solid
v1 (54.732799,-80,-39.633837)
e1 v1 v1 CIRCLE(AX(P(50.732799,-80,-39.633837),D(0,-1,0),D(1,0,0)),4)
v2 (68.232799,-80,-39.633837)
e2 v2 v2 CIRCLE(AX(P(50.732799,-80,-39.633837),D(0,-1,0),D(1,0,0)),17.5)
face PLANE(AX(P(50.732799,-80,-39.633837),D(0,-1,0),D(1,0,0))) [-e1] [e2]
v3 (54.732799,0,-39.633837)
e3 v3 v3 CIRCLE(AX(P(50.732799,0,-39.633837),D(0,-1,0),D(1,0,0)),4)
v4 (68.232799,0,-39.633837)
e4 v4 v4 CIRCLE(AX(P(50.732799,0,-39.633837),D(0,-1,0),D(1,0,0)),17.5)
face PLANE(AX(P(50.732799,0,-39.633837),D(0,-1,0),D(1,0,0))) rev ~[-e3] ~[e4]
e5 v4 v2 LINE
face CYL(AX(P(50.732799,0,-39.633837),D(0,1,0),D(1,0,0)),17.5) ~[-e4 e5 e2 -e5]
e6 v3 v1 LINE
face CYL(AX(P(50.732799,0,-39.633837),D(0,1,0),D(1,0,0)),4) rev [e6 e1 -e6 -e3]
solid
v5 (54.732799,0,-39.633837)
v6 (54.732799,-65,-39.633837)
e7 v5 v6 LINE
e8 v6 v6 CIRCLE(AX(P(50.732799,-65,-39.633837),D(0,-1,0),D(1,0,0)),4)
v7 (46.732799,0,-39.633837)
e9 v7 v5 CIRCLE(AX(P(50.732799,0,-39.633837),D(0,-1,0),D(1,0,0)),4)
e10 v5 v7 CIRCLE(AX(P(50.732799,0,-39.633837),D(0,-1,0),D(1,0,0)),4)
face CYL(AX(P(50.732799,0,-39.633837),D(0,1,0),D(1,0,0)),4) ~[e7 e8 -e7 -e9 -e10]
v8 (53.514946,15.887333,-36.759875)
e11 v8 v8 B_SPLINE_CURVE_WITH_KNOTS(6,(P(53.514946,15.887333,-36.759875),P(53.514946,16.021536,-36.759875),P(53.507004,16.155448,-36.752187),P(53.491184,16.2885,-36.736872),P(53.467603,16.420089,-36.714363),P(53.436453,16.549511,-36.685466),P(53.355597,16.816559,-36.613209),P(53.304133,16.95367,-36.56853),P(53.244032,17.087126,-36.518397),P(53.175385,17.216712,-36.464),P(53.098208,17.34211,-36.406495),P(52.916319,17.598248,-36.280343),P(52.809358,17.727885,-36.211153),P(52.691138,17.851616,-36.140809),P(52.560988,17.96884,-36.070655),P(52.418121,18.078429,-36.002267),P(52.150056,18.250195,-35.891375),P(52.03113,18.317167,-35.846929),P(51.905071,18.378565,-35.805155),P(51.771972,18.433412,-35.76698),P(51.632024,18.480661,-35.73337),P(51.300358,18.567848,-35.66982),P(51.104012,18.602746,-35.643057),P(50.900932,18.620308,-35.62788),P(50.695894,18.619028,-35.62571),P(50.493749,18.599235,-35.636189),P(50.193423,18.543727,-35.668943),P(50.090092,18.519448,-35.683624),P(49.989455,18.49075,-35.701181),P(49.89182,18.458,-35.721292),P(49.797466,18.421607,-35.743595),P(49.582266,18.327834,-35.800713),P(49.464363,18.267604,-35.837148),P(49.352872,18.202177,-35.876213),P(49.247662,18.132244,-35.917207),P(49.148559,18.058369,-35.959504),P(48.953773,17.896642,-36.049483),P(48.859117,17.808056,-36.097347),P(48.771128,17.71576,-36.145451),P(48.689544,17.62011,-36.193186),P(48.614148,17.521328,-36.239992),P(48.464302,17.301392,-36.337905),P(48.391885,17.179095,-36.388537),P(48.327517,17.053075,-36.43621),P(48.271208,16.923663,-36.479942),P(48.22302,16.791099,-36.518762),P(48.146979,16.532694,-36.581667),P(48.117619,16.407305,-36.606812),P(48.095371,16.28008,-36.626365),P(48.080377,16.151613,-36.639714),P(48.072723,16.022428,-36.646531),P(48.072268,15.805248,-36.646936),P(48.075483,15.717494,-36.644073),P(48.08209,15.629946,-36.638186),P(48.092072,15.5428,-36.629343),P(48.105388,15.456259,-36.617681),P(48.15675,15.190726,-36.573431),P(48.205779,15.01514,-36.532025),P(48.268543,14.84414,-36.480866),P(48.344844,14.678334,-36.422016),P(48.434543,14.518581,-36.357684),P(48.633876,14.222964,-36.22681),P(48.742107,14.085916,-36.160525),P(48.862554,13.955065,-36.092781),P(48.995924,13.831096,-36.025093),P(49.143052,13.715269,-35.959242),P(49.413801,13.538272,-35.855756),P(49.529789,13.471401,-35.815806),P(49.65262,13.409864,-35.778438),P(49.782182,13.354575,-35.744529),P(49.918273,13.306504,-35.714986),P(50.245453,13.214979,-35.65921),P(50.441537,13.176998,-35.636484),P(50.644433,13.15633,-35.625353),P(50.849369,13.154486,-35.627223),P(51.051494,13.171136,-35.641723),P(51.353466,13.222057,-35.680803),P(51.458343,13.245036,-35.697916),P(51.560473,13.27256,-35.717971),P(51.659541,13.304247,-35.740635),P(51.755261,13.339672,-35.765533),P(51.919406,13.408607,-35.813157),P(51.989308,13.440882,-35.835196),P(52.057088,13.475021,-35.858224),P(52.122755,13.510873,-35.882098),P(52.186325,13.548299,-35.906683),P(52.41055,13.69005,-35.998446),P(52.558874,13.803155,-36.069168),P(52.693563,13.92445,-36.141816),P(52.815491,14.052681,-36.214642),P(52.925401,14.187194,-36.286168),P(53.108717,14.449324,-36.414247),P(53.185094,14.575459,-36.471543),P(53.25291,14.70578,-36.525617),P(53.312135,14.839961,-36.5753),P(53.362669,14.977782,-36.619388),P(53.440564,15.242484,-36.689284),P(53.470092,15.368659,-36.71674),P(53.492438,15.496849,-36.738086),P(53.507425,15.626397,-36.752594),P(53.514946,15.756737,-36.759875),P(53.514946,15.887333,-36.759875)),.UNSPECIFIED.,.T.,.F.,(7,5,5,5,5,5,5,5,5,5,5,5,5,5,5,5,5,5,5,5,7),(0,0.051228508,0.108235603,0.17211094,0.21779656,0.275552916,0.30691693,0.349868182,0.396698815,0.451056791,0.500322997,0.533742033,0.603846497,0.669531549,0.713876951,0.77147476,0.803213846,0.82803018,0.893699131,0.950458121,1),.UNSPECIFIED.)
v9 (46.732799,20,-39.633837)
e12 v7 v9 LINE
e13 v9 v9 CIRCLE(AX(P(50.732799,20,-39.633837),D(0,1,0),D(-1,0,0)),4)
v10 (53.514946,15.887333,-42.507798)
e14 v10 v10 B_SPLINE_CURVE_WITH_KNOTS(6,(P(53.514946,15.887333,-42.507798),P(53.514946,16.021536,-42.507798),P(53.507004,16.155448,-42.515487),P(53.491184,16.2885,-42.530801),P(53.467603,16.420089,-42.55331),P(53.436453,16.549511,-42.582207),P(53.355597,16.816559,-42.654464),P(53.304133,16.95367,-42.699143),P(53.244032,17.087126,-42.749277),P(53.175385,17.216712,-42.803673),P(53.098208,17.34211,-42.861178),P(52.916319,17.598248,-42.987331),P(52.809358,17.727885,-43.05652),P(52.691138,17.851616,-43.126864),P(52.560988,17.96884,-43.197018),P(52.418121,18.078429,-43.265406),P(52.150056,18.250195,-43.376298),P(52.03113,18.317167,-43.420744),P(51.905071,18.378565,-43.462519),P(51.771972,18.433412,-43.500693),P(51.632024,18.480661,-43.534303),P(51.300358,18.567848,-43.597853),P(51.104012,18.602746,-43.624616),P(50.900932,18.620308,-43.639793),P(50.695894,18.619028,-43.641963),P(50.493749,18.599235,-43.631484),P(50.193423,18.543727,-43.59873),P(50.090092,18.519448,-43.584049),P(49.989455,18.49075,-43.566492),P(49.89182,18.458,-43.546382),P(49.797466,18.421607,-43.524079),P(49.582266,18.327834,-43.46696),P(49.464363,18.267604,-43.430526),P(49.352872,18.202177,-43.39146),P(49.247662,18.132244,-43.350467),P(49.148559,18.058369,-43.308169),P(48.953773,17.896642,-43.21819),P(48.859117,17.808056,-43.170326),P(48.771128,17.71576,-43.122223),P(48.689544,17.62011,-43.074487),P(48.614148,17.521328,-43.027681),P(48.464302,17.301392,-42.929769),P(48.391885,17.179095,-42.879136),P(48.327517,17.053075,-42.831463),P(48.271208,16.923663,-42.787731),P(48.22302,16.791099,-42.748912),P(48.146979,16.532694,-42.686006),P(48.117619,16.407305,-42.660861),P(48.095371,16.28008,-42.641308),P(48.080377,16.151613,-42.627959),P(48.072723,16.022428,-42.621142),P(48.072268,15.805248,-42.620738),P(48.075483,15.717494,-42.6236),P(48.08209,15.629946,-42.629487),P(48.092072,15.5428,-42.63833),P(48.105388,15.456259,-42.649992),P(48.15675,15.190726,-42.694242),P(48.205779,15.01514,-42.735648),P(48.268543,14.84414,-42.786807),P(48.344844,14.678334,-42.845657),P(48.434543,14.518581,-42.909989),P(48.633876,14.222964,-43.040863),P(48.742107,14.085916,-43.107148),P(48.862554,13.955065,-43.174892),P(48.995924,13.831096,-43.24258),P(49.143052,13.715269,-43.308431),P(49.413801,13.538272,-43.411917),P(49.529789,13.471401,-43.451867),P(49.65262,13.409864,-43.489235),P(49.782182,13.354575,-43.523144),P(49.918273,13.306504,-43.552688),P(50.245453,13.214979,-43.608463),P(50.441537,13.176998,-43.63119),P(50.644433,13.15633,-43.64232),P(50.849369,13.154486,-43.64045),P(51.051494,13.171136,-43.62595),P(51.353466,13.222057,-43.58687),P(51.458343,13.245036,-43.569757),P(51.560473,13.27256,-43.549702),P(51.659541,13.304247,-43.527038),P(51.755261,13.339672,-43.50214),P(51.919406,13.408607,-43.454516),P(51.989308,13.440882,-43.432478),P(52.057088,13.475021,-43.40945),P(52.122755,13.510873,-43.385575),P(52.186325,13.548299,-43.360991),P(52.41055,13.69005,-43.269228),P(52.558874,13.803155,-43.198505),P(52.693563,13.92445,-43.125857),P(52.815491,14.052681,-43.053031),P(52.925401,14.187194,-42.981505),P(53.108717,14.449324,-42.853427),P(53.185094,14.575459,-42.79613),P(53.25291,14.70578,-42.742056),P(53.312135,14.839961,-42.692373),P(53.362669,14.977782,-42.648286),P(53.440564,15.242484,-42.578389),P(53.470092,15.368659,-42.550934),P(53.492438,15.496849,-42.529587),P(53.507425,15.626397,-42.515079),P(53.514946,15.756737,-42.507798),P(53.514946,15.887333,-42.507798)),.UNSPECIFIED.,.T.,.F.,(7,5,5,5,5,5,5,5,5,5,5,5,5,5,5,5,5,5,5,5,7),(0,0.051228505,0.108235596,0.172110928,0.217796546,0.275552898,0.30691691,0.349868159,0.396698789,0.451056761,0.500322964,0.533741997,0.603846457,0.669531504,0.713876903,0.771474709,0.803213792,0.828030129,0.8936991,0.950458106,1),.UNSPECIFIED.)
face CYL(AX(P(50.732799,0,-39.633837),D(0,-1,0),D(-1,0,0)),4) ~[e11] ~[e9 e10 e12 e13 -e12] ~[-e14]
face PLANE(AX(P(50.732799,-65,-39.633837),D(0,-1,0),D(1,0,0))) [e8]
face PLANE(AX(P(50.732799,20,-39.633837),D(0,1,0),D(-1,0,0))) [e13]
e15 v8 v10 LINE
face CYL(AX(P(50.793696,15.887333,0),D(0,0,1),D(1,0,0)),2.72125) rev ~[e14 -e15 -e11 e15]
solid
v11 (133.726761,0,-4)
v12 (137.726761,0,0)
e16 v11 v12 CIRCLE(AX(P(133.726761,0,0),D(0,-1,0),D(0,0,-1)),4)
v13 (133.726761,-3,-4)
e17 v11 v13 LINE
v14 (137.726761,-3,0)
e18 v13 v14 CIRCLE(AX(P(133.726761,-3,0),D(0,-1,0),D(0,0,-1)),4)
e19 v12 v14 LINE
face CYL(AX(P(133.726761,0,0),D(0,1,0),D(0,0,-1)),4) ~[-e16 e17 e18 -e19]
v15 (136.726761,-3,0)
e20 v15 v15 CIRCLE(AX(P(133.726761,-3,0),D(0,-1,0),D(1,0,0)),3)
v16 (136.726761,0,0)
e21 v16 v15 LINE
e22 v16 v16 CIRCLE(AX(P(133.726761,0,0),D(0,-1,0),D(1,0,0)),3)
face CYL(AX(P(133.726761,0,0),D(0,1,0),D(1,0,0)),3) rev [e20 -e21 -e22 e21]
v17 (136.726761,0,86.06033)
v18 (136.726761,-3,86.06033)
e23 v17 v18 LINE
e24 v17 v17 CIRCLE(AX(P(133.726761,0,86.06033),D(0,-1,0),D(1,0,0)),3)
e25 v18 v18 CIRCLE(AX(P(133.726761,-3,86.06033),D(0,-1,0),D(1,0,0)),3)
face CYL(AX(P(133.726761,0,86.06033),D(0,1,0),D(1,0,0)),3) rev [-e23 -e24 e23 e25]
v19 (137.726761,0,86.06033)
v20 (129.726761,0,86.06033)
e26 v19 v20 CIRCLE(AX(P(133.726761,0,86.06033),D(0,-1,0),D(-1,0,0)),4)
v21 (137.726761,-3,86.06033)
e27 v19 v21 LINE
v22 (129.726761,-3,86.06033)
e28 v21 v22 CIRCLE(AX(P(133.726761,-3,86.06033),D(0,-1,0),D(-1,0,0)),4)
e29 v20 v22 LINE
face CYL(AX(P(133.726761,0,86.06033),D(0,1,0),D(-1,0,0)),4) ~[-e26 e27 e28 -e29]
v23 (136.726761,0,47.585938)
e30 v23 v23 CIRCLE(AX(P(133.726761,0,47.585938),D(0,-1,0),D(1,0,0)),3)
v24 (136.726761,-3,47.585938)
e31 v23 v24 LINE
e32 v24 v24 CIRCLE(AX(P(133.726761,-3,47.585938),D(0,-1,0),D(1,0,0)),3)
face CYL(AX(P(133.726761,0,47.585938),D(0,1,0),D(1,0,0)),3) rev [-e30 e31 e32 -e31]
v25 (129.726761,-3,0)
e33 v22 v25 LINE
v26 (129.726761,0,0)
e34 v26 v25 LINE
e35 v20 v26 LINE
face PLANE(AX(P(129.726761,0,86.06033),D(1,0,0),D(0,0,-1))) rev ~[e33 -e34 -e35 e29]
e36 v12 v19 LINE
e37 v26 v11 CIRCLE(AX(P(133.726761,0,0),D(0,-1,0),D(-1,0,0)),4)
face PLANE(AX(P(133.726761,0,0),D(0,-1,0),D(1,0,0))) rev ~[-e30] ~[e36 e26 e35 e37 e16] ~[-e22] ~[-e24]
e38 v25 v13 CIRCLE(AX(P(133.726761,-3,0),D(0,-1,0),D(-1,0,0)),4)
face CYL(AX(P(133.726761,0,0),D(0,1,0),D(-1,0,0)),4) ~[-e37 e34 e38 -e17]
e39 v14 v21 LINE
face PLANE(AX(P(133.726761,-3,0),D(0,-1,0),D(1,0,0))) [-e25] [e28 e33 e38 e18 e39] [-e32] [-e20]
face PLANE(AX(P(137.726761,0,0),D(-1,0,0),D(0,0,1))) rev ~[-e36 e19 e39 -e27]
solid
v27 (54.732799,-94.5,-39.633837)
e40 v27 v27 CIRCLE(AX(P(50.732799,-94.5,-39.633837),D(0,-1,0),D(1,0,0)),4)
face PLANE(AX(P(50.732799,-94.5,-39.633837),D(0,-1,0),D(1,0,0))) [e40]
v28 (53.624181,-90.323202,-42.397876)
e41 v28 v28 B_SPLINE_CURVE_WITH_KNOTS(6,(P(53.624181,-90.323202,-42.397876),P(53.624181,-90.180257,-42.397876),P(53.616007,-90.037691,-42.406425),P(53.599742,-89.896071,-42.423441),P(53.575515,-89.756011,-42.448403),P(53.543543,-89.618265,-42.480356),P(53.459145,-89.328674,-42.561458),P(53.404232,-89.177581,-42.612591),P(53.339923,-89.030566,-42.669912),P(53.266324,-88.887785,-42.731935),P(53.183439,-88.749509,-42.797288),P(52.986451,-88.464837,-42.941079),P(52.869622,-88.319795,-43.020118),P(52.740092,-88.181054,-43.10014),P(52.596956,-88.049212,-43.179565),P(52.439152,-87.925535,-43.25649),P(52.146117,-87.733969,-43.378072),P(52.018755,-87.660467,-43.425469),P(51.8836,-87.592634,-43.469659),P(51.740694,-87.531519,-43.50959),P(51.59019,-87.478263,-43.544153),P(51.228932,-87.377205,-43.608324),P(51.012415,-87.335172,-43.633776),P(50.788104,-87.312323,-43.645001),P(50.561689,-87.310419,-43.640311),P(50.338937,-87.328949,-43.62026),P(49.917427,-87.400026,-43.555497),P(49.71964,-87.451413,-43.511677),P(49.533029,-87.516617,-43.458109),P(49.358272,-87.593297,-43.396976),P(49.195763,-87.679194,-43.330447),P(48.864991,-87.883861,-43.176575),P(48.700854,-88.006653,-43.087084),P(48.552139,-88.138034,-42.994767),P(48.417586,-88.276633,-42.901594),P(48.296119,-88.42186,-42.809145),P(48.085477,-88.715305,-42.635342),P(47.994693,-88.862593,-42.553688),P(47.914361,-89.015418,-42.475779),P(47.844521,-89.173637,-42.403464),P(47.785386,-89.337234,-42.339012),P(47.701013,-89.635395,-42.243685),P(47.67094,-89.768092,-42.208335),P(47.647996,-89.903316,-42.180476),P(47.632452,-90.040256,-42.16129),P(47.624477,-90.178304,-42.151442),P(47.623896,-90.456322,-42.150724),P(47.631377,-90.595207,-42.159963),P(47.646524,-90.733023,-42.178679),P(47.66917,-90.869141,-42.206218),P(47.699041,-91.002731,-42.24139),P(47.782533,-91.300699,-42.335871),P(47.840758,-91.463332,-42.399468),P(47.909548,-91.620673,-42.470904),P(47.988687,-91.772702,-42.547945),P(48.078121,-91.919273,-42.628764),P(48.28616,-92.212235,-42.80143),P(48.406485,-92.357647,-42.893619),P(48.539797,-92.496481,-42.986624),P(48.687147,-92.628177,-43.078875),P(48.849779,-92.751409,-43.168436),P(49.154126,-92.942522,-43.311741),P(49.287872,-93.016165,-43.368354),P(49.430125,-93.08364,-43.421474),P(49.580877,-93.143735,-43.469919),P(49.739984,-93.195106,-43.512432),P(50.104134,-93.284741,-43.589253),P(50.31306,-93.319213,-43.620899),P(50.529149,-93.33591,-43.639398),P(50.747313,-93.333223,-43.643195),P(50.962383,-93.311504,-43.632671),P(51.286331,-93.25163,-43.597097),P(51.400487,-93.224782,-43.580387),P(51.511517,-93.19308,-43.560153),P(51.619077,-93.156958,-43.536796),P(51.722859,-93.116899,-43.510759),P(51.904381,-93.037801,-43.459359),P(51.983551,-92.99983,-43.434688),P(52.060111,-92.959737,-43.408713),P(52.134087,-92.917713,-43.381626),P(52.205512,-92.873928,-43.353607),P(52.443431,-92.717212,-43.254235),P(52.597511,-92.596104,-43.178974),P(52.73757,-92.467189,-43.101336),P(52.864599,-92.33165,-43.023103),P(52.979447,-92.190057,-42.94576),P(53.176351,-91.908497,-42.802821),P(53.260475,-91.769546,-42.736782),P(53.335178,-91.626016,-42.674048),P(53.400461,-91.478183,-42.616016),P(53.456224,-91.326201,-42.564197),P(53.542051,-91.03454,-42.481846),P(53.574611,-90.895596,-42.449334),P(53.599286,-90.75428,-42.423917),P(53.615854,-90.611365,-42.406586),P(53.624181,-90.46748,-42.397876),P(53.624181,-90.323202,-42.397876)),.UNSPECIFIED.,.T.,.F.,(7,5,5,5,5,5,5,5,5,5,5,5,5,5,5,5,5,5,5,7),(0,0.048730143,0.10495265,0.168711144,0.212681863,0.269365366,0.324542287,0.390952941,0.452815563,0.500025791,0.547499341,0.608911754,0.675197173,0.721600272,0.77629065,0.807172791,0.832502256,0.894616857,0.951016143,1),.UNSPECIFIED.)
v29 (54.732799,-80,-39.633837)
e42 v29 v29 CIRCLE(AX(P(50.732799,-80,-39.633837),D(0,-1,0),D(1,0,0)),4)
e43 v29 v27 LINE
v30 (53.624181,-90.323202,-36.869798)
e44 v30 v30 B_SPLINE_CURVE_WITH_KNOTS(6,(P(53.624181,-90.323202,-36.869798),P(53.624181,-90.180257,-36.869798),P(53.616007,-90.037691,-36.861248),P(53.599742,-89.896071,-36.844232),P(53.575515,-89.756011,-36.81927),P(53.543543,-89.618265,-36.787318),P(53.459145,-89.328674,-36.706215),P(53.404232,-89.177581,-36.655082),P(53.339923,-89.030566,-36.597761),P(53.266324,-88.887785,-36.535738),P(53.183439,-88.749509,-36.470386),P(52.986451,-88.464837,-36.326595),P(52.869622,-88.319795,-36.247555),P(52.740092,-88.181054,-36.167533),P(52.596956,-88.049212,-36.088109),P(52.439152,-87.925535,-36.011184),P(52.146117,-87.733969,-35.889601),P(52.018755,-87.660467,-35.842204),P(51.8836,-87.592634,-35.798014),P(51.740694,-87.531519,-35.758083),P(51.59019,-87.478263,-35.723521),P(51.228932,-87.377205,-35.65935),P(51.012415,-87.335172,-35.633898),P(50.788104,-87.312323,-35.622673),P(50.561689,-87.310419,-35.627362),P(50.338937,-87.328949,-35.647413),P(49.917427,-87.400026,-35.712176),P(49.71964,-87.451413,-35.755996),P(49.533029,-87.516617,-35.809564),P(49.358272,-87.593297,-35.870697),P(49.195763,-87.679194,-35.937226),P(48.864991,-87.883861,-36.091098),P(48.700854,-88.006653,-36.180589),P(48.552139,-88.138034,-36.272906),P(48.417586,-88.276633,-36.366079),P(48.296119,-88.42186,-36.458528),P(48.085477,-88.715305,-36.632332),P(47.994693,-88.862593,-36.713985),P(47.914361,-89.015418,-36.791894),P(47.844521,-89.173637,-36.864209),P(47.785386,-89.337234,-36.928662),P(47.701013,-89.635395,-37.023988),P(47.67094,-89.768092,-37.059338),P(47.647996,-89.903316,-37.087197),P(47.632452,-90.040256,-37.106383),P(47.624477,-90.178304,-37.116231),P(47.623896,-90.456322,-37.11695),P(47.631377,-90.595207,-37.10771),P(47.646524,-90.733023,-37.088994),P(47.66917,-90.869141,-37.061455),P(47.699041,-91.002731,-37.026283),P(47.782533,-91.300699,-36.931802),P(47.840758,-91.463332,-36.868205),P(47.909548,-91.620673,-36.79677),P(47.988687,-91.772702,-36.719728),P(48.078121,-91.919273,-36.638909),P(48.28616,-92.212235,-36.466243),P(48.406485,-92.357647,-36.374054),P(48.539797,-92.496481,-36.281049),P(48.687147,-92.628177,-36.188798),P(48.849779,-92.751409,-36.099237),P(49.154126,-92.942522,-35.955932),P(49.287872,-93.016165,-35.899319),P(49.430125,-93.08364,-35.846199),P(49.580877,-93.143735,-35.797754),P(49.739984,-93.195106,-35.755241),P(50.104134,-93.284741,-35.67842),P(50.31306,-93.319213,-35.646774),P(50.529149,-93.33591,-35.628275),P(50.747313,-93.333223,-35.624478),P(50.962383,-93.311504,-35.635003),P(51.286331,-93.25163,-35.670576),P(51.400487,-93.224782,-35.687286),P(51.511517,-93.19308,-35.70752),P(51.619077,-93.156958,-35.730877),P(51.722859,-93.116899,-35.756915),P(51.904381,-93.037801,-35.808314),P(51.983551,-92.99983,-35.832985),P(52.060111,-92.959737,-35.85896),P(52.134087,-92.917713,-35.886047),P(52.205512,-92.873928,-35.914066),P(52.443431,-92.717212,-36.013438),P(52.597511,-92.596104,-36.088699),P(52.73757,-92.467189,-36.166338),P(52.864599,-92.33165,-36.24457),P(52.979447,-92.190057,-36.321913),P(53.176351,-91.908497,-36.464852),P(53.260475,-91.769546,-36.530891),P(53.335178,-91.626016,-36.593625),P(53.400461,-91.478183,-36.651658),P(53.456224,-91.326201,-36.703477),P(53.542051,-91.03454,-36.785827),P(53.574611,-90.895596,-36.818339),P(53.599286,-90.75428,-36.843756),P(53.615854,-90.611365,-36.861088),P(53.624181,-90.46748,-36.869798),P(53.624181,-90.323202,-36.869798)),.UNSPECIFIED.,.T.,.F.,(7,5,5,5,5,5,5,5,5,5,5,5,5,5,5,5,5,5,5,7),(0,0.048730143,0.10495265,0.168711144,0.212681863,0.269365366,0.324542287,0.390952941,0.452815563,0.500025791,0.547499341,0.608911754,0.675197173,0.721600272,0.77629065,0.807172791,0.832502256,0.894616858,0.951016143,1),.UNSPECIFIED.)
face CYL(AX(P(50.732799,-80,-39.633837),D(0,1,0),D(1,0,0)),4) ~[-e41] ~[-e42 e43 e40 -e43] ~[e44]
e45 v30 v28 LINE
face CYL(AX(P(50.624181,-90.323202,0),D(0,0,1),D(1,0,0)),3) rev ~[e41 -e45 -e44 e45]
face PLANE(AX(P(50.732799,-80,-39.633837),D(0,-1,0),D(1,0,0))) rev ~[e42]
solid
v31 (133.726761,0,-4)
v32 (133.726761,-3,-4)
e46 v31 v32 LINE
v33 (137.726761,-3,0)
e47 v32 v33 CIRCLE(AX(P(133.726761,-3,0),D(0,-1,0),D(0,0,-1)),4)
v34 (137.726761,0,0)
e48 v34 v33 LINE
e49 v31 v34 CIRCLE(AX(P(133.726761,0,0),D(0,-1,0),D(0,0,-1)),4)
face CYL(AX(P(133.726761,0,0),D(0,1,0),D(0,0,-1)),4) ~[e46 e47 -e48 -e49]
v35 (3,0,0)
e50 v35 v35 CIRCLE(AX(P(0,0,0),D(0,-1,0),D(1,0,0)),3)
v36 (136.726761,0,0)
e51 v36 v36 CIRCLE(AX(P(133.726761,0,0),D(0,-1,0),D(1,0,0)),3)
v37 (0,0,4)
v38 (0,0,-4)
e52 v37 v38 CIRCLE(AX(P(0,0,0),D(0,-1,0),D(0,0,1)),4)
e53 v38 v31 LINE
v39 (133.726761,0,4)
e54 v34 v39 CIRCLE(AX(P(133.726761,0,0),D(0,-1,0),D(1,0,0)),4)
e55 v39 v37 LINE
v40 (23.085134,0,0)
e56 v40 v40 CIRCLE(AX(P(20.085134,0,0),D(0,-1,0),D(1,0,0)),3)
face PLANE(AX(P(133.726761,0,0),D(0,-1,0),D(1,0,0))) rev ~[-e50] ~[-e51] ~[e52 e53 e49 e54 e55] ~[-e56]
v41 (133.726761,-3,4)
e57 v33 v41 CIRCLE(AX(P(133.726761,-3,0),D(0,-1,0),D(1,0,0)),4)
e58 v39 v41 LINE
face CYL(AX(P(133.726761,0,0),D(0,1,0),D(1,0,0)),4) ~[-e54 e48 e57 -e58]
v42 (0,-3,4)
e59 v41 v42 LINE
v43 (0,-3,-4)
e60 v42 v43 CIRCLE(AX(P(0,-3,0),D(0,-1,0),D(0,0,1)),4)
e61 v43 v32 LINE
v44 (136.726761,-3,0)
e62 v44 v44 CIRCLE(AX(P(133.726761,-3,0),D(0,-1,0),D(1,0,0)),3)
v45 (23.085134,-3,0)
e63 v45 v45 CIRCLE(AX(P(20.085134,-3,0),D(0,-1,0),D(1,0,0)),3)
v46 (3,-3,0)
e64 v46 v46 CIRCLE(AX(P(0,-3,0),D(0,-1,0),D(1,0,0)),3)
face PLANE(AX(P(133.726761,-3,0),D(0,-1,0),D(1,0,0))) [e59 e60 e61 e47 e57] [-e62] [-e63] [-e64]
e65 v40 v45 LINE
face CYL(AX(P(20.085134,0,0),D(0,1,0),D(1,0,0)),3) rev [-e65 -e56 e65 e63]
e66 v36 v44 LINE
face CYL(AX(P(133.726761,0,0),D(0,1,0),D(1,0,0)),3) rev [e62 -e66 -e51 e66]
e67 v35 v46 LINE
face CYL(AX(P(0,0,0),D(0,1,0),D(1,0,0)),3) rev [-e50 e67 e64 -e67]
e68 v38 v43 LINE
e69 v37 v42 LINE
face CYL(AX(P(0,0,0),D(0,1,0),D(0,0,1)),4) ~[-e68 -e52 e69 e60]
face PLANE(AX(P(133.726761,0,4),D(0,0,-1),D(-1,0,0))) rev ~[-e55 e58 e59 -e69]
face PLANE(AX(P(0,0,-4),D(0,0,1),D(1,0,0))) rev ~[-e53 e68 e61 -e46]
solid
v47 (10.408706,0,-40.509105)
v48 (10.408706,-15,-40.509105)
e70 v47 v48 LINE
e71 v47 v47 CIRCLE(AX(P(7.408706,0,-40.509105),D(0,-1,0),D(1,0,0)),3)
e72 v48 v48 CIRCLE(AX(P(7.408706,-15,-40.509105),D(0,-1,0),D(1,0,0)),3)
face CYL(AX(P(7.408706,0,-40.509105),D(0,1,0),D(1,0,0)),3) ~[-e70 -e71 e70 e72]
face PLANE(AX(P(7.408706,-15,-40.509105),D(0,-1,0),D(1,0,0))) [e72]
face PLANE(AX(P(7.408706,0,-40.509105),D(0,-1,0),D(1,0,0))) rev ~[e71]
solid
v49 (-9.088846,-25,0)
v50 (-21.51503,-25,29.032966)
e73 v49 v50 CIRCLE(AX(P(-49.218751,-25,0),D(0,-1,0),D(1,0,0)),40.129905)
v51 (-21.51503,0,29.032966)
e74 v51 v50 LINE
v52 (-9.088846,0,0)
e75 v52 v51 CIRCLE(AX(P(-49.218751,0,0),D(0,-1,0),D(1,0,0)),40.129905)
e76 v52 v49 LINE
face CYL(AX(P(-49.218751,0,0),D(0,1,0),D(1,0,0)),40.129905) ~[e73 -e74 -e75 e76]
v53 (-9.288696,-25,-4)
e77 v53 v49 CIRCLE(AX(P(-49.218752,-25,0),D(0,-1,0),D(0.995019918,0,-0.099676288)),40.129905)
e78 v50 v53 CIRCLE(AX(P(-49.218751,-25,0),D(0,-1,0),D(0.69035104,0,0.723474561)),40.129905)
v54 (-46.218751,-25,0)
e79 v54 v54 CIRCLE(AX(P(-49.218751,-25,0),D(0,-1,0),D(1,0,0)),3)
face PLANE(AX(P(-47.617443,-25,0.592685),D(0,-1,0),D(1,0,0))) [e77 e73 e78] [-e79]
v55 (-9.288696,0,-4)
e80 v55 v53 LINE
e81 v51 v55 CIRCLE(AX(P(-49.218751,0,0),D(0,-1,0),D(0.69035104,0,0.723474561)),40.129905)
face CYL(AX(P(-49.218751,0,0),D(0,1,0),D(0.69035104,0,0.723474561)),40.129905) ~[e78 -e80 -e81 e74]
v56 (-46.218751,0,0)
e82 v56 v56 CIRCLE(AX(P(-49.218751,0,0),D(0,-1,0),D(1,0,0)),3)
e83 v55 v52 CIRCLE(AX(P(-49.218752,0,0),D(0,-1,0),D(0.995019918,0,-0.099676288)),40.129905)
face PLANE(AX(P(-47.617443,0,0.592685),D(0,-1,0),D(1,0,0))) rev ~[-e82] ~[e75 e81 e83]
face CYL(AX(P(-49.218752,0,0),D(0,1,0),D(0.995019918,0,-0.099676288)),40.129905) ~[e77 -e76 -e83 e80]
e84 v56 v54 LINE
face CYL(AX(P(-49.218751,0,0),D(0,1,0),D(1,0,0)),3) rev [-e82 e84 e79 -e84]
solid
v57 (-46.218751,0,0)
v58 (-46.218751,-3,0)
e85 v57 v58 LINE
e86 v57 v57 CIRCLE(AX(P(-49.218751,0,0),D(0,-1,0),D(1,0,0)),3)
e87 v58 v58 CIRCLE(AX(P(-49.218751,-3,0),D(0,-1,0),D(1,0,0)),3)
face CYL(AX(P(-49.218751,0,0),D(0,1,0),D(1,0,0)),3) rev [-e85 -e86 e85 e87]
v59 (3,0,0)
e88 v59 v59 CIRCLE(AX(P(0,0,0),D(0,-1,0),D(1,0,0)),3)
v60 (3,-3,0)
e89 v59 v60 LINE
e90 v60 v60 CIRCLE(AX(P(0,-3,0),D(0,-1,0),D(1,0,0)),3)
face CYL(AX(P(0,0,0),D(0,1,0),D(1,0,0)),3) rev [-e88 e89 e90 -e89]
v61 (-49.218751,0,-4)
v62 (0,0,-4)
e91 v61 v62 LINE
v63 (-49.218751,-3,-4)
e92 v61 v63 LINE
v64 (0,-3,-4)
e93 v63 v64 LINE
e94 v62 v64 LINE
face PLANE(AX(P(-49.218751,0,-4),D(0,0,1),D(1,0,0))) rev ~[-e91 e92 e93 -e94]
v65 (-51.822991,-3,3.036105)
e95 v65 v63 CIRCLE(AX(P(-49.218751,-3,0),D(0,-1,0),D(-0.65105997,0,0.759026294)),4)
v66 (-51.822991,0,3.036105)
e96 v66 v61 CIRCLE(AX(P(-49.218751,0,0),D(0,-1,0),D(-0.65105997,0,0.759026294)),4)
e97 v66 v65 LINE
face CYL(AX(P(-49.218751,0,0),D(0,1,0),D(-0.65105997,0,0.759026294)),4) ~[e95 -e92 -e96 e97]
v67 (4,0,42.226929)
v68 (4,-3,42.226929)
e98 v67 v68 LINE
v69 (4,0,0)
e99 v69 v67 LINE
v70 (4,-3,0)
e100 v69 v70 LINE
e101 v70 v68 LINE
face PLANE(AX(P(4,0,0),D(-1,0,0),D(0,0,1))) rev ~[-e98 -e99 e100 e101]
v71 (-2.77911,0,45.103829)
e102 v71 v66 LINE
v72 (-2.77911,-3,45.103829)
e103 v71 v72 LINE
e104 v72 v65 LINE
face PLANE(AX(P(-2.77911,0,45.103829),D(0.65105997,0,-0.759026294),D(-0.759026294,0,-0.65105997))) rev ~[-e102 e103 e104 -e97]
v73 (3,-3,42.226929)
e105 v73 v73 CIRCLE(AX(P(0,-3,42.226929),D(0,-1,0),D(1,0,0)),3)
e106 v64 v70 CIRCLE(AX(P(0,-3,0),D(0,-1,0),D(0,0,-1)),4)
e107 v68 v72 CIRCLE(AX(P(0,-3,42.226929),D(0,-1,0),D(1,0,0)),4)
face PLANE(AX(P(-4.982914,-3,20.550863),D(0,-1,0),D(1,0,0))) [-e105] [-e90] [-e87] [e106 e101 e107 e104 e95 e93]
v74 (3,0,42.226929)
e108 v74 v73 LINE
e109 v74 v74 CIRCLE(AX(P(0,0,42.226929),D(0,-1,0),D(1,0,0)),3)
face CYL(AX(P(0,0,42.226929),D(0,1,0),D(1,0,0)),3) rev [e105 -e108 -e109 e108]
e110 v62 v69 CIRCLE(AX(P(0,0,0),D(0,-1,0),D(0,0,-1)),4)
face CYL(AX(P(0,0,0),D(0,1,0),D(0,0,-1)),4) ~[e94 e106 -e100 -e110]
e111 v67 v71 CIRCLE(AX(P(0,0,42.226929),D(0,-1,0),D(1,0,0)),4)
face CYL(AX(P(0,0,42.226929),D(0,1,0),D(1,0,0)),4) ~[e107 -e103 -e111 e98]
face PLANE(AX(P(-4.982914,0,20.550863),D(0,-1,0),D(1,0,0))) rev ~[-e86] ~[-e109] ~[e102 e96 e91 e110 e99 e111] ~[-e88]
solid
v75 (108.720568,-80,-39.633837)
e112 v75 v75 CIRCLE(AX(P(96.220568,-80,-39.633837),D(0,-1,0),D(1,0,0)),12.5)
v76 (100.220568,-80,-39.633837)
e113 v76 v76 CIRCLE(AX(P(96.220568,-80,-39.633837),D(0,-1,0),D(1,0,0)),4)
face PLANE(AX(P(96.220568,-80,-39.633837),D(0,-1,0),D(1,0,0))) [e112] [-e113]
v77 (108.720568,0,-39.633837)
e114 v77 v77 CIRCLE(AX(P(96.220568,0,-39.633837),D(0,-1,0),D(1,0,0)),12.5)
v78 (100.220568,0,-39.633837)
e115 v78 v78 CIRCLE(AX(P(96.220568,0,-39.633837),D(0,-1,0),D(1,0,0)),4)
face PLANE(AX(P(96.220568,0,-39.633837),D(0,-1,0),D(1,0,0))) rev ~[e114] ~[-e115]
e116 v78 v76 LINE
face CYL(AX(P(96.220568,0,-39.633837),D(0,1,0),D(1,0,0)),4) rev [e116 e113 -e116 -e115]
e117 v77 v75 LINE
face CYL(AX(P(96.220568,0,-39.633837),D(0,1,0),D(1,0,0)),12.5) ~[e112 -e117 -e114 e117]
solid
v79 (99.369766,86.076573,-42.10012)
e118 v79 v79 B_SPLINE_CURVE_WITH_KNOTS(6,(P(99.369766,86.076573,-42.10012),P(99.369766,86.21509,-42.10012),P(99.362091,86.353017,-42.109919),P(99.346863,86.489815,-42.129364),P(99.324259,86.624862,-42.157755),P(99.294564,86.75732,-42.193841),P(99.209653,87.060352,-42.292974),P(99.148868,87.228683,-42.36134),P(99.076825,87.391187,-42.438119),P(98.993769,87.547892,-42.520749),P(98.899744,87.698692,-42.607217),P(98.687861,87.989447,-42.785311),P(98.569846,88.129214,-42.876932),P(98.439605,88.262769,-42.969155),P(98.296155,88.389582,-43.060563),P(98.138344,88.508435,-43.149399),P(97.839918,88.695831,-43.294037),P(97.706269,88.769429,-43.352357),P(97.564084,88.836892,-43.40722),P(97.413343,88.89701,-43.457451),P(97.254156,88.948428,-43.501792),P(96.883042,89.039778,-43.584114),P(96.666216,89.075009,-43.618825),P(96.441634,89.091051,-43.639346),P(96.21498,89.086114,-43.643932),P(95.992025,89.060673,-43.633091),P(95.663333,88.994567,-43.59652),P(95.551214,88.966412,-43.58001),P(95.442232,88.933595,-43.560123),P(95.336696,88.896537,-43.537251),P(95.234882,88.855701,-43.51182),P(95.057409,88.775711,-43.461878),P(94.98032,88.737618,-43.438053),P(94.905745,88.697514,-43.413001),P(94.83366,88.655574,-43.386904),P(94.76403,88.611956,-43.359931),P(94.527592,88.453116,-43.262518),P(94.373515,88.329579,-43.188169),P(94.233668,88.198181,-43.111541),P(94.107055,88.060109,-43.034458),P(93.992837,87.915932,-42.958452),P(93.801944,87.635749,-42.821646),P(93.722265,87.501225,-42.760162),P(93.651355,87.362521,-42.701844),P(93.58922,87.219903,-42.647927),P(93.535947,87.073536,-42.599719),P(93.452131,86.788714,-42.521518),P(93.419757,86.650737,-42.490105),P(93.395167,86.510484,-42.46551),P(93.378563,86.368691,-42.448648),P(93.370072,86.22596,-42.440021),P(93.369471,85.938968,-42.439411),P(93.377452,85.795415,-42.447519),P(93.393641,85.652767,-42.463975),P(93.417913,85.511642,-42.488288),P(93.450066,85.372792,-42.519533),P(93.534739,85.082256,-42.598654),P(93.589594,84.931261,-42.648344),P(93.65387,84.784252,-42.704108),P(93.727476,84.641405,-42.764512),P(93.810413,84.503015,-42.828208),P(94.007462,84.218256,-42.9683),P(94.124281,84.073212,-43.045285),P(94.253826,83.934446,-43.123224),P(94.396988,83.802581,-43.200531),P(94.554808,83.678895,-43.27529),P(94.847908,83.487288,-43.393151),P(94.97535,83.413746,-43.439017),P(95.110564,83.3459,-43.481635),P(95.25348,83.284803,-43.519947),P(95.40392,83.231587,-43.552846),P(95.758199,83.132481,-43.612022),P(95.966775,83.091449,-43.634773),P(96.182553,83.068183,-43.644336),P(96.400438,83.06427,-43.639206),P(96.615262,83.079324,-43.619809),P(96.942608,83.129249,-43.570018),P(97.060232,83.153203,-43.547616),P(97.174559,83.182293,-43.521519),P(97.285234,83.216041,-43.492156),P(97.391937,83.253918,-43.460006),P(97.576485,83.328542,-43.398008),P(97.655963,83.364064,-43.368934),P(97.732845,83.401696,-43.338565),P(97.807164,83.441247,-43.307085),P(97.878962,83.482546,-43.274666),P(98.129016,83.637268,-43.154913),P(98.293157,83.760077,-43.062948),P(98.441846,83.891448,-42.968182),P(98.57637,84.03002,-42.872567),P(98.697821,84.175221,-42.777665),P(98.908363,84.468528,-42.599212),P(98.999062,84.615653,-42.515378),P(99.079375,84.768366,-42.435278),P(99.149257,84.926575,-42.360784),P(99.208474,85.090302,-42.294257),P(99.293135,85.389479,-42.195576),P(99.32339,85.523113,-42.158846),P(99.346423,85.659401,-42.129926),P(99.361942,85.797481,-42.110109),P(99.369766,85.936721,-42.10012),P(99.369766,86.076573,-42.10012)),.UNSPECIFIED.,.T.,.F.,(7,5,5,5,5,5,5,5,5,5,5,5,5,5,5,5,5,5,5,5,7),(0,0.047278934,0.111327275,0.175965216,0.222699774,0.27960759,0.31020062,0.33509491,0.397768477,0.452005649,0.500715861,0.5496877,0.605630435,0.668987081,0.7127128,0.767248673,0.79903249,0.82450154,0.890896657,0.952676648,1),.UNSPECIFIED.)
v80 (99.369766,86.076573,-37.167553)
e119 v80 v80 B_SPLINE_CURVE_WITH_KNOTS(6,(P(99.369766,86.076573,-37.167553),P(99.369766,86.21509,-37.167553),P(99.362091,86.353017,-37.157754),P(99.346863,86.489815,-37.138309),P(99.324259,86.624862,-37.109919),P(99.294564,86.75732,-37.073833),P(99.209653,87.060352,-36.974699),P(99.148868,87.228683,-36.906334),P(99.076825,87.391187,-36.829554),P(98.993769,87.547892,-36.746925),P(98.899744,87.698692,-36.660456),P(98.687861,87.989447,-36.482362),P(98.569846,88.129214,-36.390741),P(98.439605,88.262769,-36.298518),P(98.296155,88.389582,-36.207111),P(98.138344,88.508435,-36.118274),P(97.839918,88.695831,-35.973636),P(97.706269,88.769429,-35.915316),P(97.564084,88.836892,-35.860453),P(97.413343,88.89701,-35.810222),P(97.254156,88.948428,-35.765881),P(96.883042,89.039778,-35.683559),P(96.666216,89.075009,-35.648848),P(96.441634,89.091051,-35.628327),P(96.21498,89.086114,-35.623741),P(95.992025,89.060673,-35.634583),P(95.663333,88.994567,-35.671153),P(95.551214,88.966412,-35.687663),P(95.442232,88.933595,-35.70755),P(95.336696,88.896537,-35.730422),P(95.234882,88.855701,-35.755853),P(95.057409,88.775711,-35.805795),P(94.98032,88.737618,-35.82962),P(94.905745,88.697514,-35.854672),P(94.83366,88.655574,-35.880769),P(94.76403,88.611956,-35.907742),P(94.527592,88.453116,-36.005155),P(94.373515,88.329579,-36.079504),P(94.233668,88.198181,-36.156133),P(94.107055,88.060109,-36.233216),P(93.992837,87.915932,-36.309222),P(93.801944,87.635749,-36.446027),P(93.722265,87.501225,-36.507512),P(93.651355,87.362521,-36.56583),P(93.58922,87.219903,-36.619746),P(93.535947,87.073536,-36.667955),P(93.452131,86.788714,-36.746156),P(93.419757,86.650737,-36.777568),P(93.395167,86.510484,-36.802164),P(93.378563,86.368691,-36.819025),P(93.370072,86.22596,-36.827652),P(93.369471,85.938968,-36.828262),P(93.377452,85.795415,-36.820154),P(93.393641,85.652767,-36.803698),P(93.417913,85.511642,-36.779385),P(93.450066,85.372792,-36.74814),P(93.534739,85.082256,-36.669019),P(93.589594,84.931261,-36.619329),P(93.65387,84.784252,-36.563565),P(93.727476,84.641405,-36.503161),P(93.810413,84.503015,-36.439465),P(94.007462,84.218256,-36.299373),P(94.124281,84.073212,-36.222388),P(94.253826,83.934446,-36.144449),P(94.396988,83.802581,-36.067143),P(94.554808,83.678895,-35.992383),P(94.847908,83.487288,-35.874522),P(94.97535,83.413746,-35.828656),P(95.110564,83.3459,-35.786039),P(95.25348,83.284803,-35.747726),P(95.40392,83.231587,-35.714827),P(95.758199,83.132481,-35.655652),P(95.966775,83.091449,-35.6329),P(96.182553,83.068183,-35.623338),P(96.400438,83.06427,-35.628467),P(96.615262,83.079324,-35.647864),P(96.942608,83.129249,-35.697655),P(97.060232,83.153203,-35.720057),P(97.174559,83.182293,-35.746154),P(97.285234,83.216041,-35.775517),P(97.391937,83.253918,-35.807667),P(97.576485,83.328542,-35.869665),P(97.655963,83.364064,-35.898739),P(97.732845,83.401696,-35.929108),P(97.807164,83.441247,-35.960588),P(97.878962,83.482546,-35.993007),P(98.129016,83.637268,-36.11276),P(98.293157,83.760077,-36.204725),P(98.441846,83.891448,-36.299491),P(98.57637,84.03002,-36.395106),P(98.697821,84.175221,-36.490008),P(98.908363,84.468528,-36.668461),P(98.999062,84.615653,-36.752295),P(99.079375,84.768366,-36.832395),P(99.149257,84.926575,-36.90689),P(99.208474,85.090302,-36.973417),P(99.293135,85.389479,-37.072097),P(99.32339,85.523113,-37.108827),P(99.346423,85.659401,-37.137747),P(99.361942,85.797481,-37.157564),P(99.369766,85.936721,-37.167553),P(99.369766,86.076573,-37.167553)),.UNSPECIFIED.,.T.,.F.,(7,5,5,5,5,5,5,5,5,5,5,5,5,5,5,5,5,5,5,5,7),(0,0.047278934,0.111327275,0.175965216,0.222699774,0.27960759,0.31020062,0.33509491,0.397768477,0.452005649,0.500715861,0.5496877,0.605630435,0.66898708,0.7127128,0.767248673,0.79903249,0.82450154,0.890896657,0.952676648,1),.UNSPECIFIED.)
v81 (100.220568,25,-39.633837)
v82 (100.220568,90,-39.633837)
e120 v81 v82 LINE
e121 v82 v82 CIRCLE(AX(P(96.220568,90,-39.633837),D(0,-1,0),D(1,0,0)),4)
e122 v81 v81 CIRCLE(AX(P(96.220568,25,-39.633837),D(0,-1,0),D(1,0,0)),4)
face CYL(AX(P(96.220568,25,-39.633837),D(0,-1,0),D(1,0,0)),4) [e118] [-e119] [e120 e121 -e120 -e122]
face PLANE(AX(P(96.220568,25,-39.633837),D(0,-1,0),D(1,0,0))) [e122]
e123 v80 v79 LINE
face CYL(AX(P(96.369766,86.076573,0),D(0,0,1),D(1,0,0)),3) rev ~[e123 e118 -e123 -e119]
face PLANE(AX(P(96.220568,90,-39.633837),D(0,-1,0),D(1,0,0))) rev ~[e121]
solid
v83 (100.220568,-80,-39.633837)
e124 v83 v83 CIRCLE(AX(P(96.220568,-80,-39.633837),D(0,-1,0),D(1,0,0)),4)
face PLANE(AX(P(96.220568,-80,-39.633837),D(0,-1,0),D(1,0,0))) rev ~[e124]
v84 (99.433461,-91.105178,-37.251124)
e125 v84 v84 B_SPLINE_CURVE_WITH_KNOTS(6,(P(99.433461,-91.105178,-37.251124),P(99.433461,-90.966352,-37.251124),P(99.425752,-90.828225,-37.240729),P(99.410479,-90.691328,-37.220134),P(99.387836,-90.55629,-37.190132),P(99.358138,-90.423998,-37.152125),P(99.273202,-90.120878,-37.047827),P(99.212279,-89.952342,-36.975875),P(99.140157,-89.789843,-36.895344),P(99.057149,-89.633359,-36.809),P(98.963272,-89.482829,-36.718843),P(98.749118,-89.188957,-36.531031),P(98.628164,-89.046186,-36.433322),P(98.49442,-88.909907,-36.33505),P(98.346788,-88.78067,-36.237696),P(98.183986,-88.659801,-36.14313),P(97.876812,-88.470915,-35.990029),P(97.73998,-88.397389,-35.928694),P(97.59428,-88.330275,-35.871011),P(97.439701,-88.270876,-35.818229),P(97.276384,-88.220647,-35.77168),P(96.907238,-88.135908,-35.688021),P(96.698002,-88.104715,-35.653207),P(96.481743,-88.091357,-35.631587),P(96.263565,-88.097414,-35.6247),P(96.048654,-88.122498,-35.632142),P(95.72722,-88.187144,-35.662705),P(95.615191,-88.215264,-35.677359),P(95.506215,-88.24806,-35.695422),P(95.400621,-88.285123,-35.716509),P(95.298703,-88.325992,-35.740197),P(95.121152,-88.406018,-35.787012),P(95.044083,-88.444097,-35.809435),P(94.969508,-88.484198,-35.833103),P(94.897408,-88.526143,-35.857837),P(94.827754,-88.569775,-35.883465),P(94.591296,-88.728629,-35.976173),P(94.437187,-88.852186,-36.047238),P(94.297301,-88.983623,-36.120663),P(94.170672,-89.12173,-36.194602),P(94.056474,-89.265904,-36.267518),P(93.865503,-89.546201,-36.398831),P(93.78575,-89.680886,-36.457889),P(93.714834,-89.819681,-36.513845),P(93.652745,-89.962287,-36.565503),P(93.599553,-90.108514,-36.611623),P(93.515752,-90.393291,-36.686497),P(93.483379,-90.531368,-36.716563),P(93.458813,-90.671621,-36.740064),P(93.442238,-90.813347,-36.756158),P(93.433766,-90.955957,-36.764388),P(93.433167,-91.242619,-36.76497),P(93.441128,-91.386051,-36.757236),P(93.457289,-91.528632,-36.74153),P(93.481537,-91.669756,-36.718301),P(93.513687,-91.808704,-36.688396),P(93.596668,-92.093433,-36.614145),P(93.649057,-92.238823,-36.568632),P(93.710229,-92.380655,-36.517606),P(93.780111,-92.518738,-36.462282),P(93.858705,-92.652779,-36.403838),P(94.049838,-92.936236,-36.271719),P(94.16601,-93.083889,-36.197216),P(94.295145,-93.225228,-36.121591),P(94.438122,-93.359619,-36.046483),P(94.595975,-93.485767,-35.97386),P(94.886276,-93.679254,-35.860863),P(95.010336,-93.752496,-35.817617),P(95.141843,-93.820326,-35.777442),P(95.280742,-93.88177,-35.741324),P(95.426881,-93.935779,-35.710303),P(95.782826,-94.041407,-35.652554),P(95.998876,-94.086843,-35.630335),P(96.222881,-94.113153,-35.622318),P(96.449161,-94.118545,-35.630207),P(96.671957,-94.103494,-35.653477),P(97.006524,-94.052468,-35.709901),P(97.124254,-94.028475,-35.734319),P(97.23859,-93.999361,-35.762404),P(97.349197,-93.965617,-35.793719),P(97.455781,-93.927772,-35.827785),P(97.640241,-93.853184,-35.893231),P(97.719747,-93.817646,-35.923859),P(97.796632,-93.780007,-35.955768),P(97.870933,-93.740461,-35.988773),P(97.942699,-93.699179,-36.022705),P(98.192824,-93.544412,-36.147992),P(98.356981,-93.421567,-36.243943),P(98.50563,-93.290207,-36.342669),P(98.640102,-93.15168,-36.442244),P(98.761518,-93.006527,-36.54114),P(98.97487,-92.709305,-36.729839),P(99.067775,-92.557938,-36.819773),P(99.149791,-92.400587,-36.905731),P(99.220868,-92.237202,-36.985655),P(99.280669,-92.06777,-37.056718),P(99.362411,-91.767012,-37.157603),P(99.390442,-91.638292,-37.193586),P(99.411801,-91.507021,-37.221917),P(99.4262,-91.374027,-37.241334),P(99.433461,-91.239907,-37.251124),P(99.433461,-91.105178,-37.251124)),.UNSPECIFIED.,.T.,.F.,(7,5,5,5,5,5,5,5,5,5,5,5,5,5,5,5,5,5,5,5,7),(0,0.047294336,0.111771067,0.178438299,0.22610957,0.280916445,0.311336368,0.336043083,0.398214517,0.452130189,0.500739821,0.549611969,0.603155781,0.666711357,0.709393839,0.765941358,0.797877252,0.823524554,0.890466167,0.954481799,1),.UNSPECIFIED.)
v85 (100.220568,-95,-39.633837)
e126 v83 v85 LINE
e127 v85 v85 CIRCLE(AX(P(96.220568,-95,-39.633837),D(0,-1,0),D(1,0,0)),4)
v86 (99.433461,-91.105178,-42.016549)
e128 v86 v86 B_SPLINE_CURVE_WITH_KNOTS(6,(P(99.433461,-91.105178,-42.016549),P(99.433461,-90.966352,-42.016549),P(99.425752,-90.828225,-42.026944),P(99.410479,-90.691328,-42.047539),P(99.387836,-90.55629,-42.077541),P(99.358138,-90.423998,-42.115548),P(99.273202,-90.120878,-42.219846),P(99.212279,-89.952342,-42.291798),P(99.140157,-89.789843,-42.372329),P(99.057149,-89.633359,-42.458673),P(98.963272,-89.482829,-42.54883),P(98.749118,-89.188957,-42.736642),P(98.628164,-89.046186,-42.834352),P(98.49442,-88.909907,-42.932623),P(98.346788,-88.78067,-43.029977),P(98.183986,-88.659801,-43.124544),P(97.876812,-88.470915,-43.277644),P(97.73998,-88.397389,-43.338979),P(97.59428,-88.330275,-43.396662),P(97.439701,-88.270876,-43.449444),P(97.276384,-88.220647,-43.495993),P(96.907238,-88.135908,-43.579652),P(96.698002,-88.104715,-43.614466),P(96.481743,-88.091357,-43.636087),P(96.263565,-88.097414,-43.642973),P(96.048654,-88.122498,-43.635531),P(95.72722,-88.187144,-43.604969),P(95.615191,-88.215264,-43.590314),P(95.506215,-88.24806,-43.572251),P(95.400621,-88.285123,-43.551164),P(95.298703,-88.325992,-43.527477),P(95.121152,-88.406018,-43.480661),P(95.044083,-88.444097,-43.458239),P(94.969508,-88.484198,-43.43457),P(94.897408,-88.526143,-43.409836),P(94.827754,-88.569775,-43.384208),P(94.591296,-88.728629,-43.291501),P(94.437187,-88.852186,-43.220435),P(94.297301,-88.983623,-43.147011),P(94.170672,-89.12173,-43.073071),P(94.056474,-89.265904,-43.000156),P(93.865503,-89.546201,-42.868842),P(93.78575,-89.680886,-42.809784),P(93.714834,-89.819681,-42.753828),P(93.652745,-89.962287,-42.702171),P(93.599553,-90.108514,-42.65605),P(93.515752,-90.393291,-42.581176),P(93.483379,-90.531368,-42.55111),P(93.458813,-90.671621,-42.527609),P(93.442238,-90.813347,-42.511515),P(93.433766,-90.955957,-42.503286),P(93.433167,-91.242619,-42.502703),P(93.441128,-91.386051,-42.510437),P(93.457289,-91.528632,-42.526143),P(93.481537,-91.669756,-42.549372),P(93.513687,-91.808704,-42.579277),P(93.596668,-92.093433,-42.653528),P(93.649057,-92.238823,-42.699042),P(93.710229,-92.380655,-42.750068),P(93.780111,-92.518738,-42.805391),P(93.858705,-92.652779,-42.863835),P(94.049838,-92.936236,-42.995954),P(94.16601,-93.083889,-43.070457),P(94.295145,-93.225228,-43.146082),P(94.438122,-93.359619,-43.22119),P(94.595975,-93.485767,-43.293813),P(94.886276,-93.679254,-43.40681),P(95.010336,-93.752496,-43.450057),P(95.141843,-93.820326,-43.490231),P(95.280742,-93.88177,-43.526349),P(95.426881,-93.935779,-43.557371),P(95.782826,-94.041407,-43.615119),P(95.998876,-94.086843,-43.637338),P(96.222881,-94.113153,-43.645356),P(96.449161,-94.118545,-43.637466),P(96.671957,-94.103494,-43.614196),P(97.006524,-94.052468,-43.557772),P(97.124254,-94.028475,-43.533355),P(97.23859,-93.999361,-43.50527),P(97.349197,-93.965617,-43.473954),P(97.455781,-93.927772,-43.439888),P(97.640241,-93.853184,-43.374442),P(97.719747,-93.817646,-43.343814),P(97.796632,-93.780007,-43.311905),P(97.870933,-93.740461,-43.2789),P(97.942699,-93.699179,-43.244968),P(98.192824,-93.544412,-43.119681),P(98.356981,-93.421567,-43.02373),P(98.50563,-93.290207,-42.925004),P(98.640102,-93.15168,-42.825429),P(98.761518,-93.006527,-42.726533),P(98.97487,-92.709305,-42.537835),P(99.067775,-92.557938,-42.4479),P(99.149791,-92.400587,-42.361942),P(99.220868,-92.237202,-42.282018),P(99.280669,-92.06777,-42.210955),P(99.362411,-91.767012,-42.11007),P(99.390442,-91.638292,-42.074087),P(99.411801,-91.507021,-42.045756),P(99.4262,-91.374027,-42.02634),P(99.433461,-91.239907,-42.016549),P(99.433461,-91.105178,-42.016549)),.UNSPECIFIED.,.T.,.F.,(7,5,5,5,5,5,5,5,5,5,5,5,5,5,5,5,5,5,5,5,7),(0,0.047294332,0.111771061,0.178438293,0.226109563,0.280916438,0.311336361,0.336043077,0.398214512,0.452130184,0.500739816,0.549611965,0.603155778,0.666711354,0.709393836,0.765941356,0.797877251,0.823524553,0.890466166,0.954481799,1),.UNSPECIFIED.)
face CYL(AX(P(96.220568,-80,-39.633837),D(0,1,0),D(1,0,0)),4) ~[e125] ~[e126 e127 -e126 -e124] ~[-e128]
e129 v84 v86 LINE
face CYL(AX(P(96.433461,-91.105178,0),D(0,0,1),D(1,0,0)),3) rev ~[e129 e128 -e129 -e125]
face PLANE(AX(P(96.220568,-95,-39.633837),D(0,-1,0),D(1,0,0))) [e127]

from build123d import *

# Parameters (mm, degrees)
F0_R      = 4
F1_DEPTH  = 65
F0_R_2    = 17.5
F2_DEPTH  = 80
F3_R      = 4
F4_DEPTH  = 20
F5_R      = 2.7212500561
F6_DEPTH  = 57.1348365972
F7_R      = 4
F8_DEPTH  = 14.5
F9_R      = 3
F10_DEPTH = 57.1348365972
F0_R_3    = 3
F11_DEPTH = 15
F0_R_4    = 12.5
F12_DEPTH = 80
F13_R     = 4
F14_DEPTH = 15
F15_R     = 3
F16_DEPTH = 57.1348365972
F17_START = -25
F17_DEPTH = 65
F18_R     = 3
F19_DEPTH = 57.1348365972
F20_DEPTH = 3
F21_DEPTH = 3
F22_DEPTH = 3
F23_DEPTH = 25


with BuildPart() as f1:
    # F0 (on Front) → F1 (new body)
    with BuildSketch(Plane.XZ):
        with Locations((50.7327988744, -39.6338365972)):
            Circle(F0_R)
    extrude(amount=F1_DEPTH)

    # F3 (on face) → F4 (join)
    with BuildSketch(Plane(origin=(0, 0, 0), x_dir=(-1, 0, 0), z_dir=(0, 1, 0))):
        with Locations((-50.7327988744, -39.6338365972)):
            Circle(F3_R)
    extrude(amount=F4_DEPTH)

    # F5 (on Top) → F6 (cut, through all)
    with BuildSketch(Plane.XY):
        with Locations((50.7936961949, 15.8873330802)):
            Circle(F5_R)
    extrude(amount=-F6_DEPTH, mode=Mode.SUBTRACT)


with BuildPart() as f2:
    # F0 (on Front) → F2 (new body)
    with BuildSketch(Plane.XZ):
        with Locations((50.7327988744, -39.6338365972)):
            Circle(F0_R_2)
        with Locations((50.7327988744, -39.6338365972)):
            Circle(F0_R, mode=Mode.SUBTRACT)
    extrude(amount=F2_DEPTH)


with BuildPart() as f8:
    # F7 (on face) → F8 (new body)
    with BuildSketch(Plane.XZ.offset(80)):
        with Locations((50.7327988744, -39.6338365972)):
            Circle(F7_R)
    extrude(amount=F8_DEPTH)

    # F9 (on Top) → F10 (cut, through all)
    with BuildSketch(Plane.XY):
        with Locations((50.6241805851, -90.323202312)):
            Circle(F9_R)
    extrude(amount=-F10_DEPTH, mode=Mode.SUBTRACT)


with BuildPart() as f11:
    # F0 (on Front) → F11 (new body)
    with BuildSketch(Plane.XZ):
        with Locations((7.40870554, -40.5091047287)):
            Circle(F0_R_3)
    extrude(amount=F11_DEPTH)


with BuildPart() as f12:
    # F0 (on Front) → F12 (new body)
    with BuildSketch(Plane.XZ):
        with Locations((96.2205678225, -39.6338365972)):
            Circle(F0_R_4)
        with Locations((96.2205678225, -39.6338365972)):
            Circle(F0_R, mode=Mode.SUBTRACT)
    extrude(amount=F12_DEPTH)


with BuildPart() as f14:
    # F13 (on face) → F14 (new body)
    with BuildSketch(Plane.XZ.offset(80)):
        with Locations((96.2205678225, -39.6338365972)):
            Circle(F13_R)
    extrude(amount=F14_DEPTH)

    # F15 (on Top) → F16 (cut, through all)
    with BuildSketch(Plane.XY):
        with Locations((96.4334607124, -91.1051779985)):
            Circle(F15_R)
    extrude(amount=-F16_DEPTH, mode=Mode.SUBTRACT)


with BuildPart() as f17:
    # F0 (on Front) → F17 (new body)
    with BuildSketch(Plane.XZ.offset(F17_START)):
        with Locations((96.2205678225, -39.6338365972)):
            Circle(F0_R)
    extrude(amount=-F17_DEPTH)

    # F18 (on Top) → F19 (cut, through all)
    with BuildSketch(Plane.XY):
        with Locations((96.3697656989, 86.0765725374)):
            Circle(F18_R)
    extrude(amount=-F19_DEPTH, mode=Mode.SUBTRACT)


with BuildPart() as f20:
    # F0 (on Front) → F20 (new body)
    with BuildSketch(Plane.XZ):
        with BuildLine():
            ThreePointArc((129.726760745, 0), (130.8983336203, -2.8284271247), (133.726760745, -4))
            ThreePointArc((133.726760745, -4), (136.5551878698, -2.8284271247), (137.726760745, 0))
            ThreePointArc((137.726760745, 0), (136.5551878698, 2.8284271247), (133.726760745, 4))
            ThreePointArc((133.726760745, 4), (130.8983336203, 2.8284271247), (129.726760745, 0))
        make_face()
        with Locations((133.726760745, 0)):
            Circle(F0_R_3, mode=Mode.SUBTRACT)
        with BuildLine():
            Line((129.726760745, 86.0603302717), (129.726760745, 4))
            Line((129.726760745, 4), (133.726760745, 4))
            ThreePointArc((133.726760745, 4), (136.5551878698, 2.8284271247), (137.726760745, 0))
            Line((137.726760745, 0), (137.726760745, 86.0603302717))
            ThreePointArc((137.726760745, 86.0603302717), (133.726760745, 82.0603302717), (129.726760745, 86.0603302717))
        make_face()
        with Locations((133.726760745, 47.5859381258)):
            Circle(F0_R_3, mode=Mode.SUBTRACT)
        with BuildLine():
            Line((133.726760745, 4), (129.726760745, 4))
            Line((129.726760745, 4), (129.726760745, 0))
            ThreePointArc((129.726760745, 0), (130.8983336203, 2.8284271247), (133.726760745, 4))
        make_face()
        with BuildLine():
            ThreePointArc((137.726760745, 86.0603302717), (133.726760745, 90.0603302717), (129.726760745, 86.0603302717))
            ThreePointArc((129.726760745, 86.0603302717), (133.726760745, 82.0603302717), (137.726760745, 86.0603302717))
        make_face()
        with Locations((133.726760745, 86.0603302717)):
            Circle(F0_R_3, mode=Mode.SUBTRACT)
    extrude(amount=F20_DEPTH)


with BuildPart() as f21:
    # F0 (on Front) → F21 (new body)
    with BuildSketch(Plane.XZ):
        with BuildLine():
            ThreePointArc((129.726760745, 0), (130.8983336203, -2.8284271247), (133.726760745, -4))
            ThreePointArc((133.726760745, -4), (136.5551878698, -2.8284271247), (137.726760745, 0))
            ThreePointArc((137.726760745, 0), (136.5551878698, 2.8284271247), (133.726760745, 4))
            ThreePointArc((133.726760745, 4), (130.8983336203, 2.8284271247), (129.726760745, 0))
        make_face()
        with Locations((133.726760745, 0)):
            Circle(F0_R_3, mode=Mode.SUBTRACT)
        with BuildLine():
            Line((133.726760745, 4), (129.726760745, 4))
            Line((129.726760745, 4), (129.726760745, 0))
            ThreePointArc((129.726760745, 0), (130.8983336203, 2.8284271247), (133.726760745, 4))
        make_face()
        with BuildLine():
            Line((4, 4), (4, 0))
            ThreePointArc((4, 0), (2.8284271247, -2.8284271247), (0, -4))
            Line((0, -4), (133.726760745, -4))
            ThreePointArc((133.726760745, -4), (130.8983336203, -2.8284271247), (129.726760745, 0))
            Line((129.726760745, 0), (129.726760745, 4))
            Line((129.726760745, 4), (4, 4))
        make_face()
        with Locations((20.0851336122, 0)):
            Circle(F0_R_3, mode=Mode.SUBTRACT)
        with BuildLine():
            ThreePointArc((0, 4), (2.8284271247, 2.8284271247), (4, 0))
            Line((4, 0), (4, 4))
            Line((4, 4), (0, 4))
        make_face()
        with BuildLine():
            ThreePointArc((0, -4), (2.8284271247, -2.8284271247), (4, 0))
            ThreePointArc((4, 0), (2.8284271247, 2.8284271247), (0, 4))
            ThreePointArc((0, 4), (-4, 0), (0, -4))
        make_face()
        Circle(F0_R_3, mode=Mode.SUBTRACT)
    extrude(amount=F21_DEPTH)


with BuildPart() as f22:
    # F0 (on Front) → F22 (new body)
    with BuildSketch(Plane.XZ):
        with BuildLine():
            ThreePointArc((0, -4), (-4, 0), (0, 4))
            Line((0, 4), (4, 4))
            Line((4, 4), (4, 42.2269292176))
            ThreePointArc((4, 42.2269292176), (-1.5626198278, 38.5447804871), (-2.7791096368, 45.1038285253))
            Line((-2.7791096368, 45.1038285253), (-21.5150295914, 29.0329656681))
            ThreePointArc((-21.5150295914, 29.0329656681), (-12.32595382, 15.790211607), (-9.088846151, 0))
            ThreePointArc((-9.088846151, 0), (-9.1388398448, -2.0024947008), (-9.2886963621, -4))
            Line((-9.2886963621, -4), (0, -4))
        make_face()
        with BuildLine():
            Line((-49.2187514901, -4), (-9.2886963621, -4))
            ThreePointArc((-9.2886963621, -4), (-9.1388398448, -2.0024947008), (-9.088846151, 0))
            ThreePointArc((-9.088846151, 0), (-12.32595382, 15.790211607), (-21.5150295914, 29.0329656681))
            Line((-21.5150295914, 29.0329656681), (-51.8229913698, 3.0361051775))
            ThreePointArc((-51.8229913698, 3.0361051775), (-47.5479671711, 3.634347226), (-45.2187514901, 0))
            ThreePointArc((-45.2187514901, 0), (-46.3903243654, -2.8284271247), (-49.2187514901, -4))
        make_face()
        with BuildLine():
            ThreePointArc((-51.8229913698, 3.0361051775), (-52.9700459807, -1.3884486468), (-49.2187514901, -4))
            ThreePointArc((-49.2187514901, -4), (-46.3903243654, -2.8284271247), (-45.2187514901, 0))
            ThreePointArc((-45.2187514901, 0), (-47.5479671711, 3.634347226), (-51.8229913698, 3.0361051775))
        make_face()
        with Locations((-49.2187514901, 0)):
            Circle(F0_R_3, mode=Mode.SUBTRACT)
        with BuildLine():
            ThreePointArc((0, -4), (2.8284271247, -2.8284271247), (4, 0))
            ThreePointArc((4, 0), (2.8284271247, 2.8284271247), (0, 4))
            ThreePointArc((0, 4), (-4, 0), (0, -4))
        make_face()
        Circle(F0_R_3, mode=Mode.SUBTRACT)
        with BuildLine():
            ThreePointArc((0, 4), (2.8284271247, 2.8284271247), (4, 0))
            Line((4, 0), (4, 4))
            Line((4, 4), (0, 4))
        make_face()
        with BuildLine():
            ThreePointArc((-2.7791096368, 45.1038285253), (-1.5626198278, 38.5447804871), (4, 42.2269292176))
            ThreePointArc((4, 42.2269292176), (1.5626198278, 45.9090779481), (-2.7791096368, 45.1038285253))
        make_face()
        with Locations((0, 42.2269292176)):
            Circle(F0_R_3, mode=Mode.SUBTRACT)
    extrude(amount=F22_DEPTH)


with BuildPart() as f23:
    # F0 (on Front) → F23 (new body)
    with BuildSketch(Plane.XZ):
        with BuildLine():
            ThreePointArc((-21.5150295914, 29.0329656681), (-86.8535246917, -13.9295781915), (-9.2886963621, -4))
            Line((-9.2886963621, -4), (-49.2187514901, -4))
            ThreePointArc((-49.2187514901, -4), (-52.9700459807, -1.3884486468), (-51.8229913698, 3.0361051775))
            Line((-51.8229913698, 3.0361051775), (-21.5150295914, 29.0329656681))
        make_face()
        with BuildLine():
            Line((-49.2187514901, -4), (-9.2886963621, -4))
            ThreePointArc((-9.2886963621, -4), (-9.1388398448, -2.0024947008), (-9.088846151, 0))
            ThreePointArc((-9.088846151, 0), (-12.32595382, 15.790211607), (-21.5150295914, 29.0329656681))
            Line((-21.5150295914, 29.0329656681), (-51.8229913698, 3.0361051775))
            ThreePointArc((-51.8229913698, 3.0361051775), (-47.5479671711, 3.634347226), (-45.2187514901, 0))
            ThreePointArc((-45.2187514901, 0), (-46.3903243654, -2.8284271247), (-49.2187514901, -4))
        make_face()
        with BuildLine():
            ThreePointArc((-51.8229913698, 3.0361051775), (-52.9700459807, -1.3884486468), (-49.2187514901, -4))
            ThreePointArc((-49.2187514901, -4), (-46.3903243654, -2.8284271247), (-45.2187514901, 0))
            ThreePointArc((-45.2187514901, 0), (-47.5479671711, 3.634347226), (-51.8229913698, 3.0361051775))
        make_face()
        with Locations((-49.2187514901, 0)):
            Circle(F0_R_3, mode=Mode.SUBTRACT)
    extrude(amount=F23_DEPTH)


solid = Compound([f1.part, f2.part, f8.part, f11.part, f12.part, f14.part, f17.part, f20.part, f21.part, f22.part, f23.part])
